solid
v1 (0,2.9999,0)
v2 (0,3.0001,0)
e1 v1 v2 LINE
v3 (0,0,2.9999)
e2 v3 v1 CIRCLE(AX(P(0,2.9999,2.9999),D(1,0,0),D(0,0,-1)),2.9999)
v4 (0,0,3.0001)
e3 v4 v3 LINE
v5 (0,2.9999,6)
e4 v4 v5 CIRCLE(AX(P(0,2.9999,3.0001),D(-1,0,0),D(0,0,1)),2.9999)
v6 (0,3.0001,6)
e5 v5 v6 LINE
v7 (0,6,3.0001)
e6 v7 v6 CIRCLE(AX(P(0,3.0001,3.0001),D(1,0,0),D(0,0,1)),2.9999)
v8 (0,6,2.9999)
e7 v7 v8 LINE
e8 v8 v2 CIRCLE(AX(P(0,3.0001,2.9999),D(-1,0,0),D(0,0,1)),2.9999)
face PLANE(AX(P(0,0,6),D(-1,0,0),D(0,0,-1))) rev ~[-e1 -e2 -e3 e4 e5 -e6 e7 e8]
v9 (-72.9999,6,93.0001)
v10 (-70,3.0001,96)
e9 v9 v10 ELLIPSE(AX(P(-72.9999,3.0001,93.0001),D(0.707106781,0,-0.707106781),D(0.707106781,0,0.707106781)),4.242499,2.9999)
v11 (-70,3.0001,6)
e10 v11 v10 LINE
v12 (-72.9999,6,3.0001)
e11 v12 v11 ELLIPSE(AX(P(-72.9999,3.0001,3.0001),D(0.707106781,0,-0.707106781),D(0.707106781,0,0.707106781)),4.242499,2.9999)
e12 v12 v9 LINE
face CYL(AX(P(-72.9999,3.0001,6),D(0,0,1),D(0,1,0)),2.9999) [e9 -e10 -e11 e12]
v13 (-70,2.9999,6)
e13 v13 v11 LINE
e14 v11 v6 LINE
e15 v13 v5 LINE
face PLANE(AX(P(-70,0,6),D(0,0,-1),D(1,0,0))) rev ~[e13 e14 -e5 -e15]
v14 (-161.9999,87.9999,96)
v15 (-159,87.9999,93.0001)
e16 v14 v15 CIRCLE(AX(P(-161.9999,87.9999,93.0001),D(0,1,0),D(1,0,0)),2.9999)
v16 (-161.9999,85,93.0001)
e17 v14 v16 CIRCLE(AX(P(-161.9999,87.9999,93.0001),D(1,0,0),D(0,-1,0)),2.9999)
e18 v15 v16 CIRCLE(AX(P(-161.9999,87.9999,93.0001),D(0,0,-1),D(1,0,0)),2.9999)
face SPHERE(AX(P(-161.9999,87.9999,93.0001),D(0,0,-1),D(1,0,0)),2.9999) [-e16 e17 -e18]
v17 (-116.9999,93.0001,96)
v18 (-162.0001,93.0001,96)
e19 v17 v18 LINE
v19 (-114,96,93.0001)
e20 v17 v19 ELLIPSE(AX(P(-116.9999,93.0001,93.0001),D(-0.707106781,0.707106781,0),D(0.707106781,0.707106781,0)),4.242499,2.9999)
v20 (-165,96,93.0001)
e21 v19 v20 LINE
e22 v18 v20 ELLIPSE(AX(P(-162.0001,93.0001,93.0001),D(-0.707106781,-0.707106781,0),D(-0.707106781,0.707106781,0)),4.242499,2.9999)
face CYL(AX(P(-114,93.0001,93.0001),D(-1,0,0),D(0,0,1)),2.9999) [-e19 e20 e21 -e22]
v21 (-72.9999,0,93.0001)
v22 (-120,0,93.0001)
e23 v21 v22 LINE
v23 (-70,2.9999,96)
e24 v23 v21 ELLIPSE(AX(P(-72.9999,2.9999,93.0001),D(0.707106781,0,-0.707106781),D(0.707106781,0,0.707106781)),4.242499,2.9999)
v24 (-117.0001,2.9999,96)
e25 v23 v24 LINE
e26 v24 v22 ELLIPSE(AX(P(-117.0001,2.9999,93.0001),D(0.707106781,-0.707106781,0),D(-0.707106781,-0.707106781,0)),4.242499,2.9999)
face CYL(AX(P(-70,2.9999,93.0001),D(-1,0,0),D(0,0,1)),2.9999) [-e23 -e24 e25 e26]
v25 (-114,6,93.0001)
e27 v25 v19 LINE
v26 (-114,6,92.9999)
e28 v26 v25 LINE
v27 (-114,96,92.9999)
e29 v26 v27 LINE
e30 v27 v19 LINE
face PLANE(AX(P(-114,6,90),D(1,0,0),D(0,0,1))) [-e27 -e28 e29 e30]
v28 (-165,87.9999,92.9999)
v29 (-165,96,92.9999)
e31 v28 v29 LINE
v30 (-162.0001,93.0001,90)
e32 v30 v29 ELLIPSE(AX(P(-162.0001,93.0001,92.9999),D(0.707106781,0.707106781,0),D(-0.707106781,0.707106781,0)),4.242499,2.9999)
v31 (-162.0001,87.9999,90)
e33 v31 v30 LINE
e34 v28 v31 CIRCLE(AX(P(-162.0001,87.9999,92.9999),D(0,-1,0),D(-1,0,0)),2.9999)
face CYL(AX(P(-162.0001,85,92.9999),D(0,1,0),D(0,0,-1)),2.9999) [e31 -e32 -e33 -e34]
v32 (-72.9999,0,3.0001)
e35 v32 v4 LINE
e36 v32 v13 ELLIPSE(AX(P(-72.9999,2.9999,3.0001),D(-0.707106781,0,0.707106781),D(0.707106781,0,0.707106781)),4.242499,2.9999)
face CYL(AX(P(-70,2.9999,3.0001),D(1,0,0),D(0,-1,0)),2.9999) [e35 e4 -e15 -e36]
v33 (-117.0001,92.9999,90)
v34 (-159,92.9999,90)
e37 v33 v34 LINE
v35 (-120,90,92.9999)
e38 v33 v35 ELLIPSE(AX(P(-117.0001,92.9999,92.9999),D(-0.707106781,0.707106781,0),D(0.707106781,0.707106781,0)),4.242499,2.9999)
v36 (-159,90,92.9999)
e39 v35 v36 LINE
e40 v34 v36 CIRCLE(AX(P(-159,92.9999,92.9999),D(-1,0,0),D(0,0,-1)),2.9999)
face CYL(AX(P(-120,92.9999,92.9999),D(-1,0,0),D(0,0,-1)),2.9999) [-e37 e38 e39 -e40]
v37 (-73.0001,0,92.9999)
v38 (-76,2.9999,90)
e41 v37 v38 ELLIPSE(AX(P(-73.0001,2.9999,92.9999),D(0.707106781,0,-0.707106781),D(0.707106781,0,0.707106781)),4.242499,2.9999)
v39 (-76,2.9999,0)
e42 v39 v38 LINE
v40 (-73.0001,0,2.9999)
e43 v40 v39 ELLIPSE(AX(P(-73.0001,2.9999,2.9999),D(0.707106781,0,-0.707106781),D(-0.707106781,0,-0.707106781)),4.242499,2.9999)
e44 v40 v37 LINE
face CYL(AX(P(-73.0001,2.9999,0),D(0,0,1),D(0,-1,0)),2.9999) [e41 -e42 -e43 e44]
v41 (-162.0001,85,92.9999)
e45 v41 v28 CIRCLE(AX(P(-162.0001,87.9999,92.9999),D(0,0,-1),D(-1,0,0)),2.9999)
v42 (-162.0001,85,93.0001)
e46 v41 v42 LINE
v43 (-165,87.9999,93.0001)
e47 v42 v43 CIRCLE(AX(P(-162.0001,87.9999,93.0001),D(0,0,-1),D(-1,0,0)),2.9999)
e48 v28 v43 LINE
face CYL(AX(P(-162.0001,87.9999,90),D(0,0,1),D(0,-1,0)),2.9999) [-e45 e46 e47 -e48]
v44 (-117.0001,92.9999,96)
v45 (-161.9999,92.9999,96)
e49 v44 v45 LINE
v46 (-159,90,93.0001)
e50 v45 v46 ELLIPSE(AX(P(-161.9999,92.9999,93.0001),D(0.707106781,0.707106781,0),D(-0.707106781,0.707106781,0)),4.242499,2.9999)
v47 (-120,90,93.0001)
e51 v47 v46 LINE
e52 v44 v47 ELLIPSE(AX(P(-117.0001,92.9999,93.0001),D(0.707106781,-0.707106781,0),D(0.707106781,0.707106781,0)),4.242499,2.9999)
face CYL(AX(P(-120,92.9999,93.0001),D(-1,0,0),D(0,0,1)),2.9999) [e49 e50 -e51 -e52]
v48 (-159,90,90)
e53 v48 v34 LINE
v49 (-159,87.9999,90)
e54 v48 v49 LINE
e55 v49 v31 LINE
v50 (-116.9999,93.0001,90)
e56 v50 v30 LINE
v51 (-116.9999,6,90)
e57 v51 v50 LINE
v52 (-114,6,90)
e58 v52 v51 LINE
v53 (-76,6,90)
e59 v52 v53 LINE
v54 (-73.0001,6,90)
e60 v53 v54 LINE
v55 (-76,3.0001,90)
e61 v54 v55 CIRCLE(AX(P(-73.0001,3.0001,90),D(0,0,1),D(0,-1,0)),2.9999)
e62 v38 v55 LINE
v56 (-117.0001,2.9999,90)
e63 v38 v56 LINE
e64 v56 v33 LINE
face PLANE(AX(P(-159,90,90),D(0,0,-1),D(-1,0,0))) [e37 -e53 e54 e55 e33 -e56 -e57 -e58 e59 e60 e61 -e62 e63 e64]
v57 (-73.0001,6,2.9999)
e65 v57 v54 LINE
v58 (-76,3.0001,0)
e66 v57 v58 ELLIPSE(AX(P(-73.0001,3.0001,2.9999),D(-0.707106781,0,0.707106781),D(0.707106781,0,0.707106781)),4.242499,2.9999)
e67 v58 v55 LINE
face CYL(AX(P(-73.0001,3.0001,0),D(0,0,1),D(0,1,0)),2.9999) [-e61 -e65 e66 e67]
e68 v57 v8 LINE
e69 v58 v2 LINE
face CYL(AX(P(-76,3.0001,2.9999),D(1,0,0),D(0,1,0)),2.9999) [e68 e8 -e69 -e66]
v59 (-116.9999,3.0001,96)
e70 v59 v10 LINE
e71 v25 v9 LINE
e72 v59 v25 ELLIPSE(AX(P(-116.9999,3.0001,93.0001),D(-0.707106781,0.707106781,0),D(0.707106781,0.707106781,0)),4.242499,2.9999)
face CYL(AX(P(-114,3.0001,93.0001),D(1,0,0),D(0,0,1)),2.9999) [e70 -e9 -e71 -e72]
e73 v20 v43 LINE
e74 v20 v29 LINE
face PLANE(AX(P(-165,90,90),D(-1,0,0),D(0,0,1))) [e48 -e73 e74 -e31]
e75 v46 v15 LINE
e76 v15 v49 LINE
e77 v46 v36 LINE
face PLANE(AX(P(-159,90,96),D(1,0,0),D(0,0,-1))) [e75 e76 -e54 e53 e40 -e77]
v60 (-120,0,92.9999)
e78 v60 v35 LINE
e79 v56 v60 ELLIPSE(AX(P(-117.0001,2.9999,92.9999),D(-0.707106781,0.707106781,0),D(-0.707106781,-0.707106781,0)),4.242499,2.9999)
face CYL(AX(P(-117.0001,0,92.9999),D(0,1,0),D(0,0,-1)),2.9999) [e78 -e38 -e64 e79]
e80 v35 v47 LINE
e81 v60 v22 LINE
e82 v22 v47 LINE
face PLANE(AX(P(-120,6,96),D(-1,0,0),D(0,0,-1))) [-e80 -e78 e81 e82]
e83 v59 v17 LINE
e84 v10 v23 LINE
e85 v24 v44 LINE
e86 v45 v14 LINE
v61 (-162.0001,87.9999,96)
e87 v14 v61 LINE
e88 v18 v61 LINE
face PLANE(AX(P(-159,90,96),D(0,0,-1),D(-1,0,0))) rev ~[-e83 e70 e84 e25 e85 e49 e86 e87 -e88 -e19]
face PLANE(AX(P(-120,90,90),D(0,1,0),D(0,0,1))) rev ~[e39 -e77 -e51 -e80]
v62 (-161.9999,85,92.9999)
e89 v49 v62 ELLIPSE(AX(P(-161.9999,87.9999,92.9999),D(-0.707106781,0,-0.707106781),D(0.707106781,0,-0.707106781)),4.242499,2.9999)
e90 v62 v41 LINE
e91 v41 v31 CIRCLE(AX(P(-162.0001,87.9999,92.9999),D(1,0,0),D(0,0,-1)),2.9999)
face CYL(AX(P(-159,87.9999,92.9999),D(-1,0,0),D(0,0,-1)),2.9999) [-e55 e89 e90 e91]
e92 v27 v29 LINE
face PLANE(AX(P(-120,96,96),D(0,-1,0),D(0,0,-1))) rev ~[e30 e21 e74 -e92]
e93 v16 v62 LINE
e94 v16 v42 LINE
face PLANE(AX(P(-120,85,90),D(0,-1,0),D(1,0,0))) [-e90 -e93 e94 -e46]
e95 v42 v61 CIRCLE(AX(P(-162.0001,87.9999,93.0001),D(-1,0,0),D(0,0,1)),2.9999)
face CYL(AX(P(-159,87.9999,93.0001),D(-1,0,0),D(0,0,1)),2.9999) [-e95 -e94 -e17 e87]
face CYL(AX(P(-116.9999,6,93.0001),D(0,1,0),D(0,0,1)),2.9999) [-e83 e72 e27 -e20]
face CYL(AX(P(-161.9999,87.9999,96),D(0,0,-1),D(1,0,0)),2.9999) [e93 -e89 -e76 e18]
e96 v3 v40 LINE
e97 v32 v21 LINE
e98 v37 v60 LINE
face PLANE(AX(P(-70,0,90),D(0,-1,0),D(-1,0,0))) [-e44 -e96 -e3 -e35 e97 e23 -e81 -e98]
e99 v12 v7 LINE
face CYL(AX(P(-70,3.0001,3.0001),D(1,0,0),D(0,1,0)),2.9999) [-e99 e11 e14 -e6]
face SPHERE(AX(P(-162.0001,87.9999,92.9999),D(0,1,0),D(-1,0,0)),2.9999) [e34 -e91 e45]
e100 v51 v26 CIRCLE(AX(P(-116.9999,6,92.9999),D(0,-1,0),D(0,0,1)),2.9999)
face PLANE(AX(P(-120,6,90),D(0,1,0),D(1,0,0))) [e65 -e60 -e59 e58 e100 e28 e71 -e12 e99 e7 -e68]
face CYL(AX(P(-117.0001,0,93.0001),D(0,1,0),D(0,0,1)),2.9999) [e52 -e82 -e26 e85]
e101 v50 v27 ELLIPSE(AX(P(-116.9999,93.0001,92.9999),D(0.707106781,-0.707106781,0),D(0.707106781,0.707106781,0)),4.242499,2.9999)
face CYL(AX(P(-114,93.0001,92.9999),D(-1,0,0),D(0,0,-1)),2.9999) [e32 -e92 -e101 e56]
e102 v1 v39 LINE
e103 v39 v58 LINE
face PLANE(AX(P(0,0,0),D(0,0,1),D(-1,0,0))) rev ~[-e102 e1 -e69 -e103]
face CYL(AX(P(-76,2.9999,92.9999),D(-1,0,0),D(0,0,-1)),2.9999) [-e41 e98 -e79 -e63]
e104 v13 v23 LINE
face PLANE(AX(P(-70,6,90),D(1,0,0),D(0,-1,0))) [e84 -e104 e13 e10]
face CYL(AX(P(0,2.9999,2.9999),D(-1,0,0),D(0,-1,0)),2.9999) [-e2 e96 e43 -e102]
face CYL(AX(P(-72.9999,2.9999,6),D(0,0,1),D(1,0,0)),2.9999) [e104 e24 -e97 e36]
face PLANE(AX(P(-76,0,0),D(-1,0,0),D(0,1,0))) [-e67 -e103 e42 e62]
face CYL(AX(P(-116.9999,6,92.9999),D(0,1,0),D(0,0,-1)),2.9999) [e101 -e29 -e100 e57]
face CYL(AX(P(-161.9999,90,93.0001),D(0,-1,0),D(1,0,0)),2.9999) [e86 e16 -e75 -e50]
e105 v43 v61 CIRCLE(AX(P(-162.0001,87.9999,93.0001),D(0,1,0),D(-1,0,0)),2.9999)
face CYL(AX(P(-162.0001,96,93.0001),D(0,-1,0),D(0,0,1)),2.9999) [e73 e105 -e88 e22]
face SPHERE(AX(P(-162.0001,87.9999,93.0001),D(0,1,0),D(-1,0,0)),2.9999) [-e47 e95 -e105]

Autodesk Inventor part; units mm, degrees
ref_plane "YZ Plane" through (0, 0, 0) normal (1, 0, 0) x (0, 1, 0)
ref_plane "XZ Plane" through (0, 0, 0) normal (0, 1, 0) x (-1, 0, 0)
ref_plane "XY Plane" through (0, 0, 0) normal (0, 0, 1) x (1, 0, 0)
sketch "Skizze1" plane through (0, 0, 0) normal (0, 1, 0) x (-1, 0, 0)
  line L0 (0, 0) -> (70, 0)
  line L1 (70, 0) -> (70, 6)
  line L2 (70, 6) -> (0, 6)
  line L3 (0, 6) -> (0, 0)
  dimension "d0" = 70
  dimension "d1" = 6
extrude "Extrusion1" add sketch "Skizze1" along normal blind 6
sketch "Skizze2" plane through (0, 0, 0) normal (0, 0, 1) x (1, 0, 0)
  line L0 (0, 0) -> (-70, 0) projected
  line L1 (-70, 0) -> (-76, 0)
  line L2 (-76, 0) -> (-76, 6)
  line L3 (-76, 6) -> (-70, 6)
  line L4 (-70, 6) -> (-70, 0)
  dimension "d4" = 6
  dimension "d5" = 6
extrude "Extrusion2" add sketch "Skizze2" along normal blind 90
sketch "Skizze3" plane through (0, 0, 90) normal (0, 0, 1) x (1, 0, 0)
  line L0 (-70, 0) -> (0, 0) projected
  line L1 (-70, 0) -> (-120, 0)
  line L2 (-120, 0) -> (-120, 6)
  line L3 (-120, 6) -> (-70, 6)
  line L4 (-70, 6) -> (-70, 0)
  dimension "d8" = 50
extrude "Extrusion3" add sketch "Skizze3" along normal blind 6
sketch "Skizze4" plane through (0, 6, 0) normal (0, 1, 0) x (1, 0, 0)
  line L0 (-120, -90) -> (-76, -90) projected
  line L1 (-70, -96) -> (-120, -96) projected
  line L2 (-120, -90) -> (-114, -90)
  line L3 (-114, -90) -> (-114, -96)
  line L4 (-114, -96) -> (-120, -96)
  line L5 (-120, -96) -> (-120, -90)
  point P0 (0, 0)
  dimension "d11" = 6
extrude "Extrusion4" add sketch "Skizze4" along normal blind 90
sketch "Skizze5" plane through (-120, 0, 90) normal (-1, 0, 0) x (0, 0, 1)
  line L0 (6, 96) -> (0, 96) projected
  line L1 (0, 0) -> (0, 96) projected
  line L2 (6, 96) -> (0, 96)
  line L3 (0, 96) -> (0, 90)
  line L4 (0, 90) -> (6, 90)
  line L5 (6, 90) -> (6, 96)
  point P0 (-90, 0)
  dimension "d14" = 6
extrude "Extrusion5" add sketch "Skizze5" along normal blind 45
sketch "Skizze6" plane through (-165, 0, 90) normal (-1, 0, 0) x (0, 0, 1)
  point P0 (-90, 0)
sketch "Skizze7" plane through (-120, 90, 90) normal (0, -1, 0) x (1, 0, 0)
  line L0 (6, 6) -> (-45, 6) projected
  line L1 (6, 0) -> (-45, 0) projected
  line L2 (-45, 6) -> (-39, 6)
  line L3 (-39, 6) -> (-39, 0)
  line L4 (-39, 0) -> (-45, 0)
  line L5 (-45, 0) -> (-45, 6)
  point P0 (120, -90)
  dimension "d17" = 6
extrude "Extrusion6" add sketch "Skizze7" along normal blind 5
fillet "Rundung1" radius 3 26 edges at (-38, 0, 0) (-38, 6, 0) (-35, 6, 6) (-35, 0, 6) (-70, 0, 51) (-70, 6, 51) (-76, 6, 45) (-76, 0, 45) (-98, 0, 90) (-95, 0, 96) (-92, 6, 96) (-120, 45, 96) (-120, 45, 90) (-114, 51, 90) (-114, 51, 96) (-139.5, 90, 96) (-139.5, 90, 90) (-139.5, 96, 96) (-139.5, 96, 90) (-165, 90.5, 96) (-165, 90.5, 90) (-165, 85, 93) (-159, 85, 93) (-159, 87.5, 96) (-162, 85, 90) (-162, 85, 96)
sketch "Skizze8" plane through (0, 0, 0) normal (0, 0, 1) x (1, 0, 0)
  arc A0 (-73, 6) -> (-73, 0) centre (-73, 3) ccw projected
  line L0 (-159, 90) -> (-162, 93) projected
  point P0 (0, 0)
properties part number "Draht"
